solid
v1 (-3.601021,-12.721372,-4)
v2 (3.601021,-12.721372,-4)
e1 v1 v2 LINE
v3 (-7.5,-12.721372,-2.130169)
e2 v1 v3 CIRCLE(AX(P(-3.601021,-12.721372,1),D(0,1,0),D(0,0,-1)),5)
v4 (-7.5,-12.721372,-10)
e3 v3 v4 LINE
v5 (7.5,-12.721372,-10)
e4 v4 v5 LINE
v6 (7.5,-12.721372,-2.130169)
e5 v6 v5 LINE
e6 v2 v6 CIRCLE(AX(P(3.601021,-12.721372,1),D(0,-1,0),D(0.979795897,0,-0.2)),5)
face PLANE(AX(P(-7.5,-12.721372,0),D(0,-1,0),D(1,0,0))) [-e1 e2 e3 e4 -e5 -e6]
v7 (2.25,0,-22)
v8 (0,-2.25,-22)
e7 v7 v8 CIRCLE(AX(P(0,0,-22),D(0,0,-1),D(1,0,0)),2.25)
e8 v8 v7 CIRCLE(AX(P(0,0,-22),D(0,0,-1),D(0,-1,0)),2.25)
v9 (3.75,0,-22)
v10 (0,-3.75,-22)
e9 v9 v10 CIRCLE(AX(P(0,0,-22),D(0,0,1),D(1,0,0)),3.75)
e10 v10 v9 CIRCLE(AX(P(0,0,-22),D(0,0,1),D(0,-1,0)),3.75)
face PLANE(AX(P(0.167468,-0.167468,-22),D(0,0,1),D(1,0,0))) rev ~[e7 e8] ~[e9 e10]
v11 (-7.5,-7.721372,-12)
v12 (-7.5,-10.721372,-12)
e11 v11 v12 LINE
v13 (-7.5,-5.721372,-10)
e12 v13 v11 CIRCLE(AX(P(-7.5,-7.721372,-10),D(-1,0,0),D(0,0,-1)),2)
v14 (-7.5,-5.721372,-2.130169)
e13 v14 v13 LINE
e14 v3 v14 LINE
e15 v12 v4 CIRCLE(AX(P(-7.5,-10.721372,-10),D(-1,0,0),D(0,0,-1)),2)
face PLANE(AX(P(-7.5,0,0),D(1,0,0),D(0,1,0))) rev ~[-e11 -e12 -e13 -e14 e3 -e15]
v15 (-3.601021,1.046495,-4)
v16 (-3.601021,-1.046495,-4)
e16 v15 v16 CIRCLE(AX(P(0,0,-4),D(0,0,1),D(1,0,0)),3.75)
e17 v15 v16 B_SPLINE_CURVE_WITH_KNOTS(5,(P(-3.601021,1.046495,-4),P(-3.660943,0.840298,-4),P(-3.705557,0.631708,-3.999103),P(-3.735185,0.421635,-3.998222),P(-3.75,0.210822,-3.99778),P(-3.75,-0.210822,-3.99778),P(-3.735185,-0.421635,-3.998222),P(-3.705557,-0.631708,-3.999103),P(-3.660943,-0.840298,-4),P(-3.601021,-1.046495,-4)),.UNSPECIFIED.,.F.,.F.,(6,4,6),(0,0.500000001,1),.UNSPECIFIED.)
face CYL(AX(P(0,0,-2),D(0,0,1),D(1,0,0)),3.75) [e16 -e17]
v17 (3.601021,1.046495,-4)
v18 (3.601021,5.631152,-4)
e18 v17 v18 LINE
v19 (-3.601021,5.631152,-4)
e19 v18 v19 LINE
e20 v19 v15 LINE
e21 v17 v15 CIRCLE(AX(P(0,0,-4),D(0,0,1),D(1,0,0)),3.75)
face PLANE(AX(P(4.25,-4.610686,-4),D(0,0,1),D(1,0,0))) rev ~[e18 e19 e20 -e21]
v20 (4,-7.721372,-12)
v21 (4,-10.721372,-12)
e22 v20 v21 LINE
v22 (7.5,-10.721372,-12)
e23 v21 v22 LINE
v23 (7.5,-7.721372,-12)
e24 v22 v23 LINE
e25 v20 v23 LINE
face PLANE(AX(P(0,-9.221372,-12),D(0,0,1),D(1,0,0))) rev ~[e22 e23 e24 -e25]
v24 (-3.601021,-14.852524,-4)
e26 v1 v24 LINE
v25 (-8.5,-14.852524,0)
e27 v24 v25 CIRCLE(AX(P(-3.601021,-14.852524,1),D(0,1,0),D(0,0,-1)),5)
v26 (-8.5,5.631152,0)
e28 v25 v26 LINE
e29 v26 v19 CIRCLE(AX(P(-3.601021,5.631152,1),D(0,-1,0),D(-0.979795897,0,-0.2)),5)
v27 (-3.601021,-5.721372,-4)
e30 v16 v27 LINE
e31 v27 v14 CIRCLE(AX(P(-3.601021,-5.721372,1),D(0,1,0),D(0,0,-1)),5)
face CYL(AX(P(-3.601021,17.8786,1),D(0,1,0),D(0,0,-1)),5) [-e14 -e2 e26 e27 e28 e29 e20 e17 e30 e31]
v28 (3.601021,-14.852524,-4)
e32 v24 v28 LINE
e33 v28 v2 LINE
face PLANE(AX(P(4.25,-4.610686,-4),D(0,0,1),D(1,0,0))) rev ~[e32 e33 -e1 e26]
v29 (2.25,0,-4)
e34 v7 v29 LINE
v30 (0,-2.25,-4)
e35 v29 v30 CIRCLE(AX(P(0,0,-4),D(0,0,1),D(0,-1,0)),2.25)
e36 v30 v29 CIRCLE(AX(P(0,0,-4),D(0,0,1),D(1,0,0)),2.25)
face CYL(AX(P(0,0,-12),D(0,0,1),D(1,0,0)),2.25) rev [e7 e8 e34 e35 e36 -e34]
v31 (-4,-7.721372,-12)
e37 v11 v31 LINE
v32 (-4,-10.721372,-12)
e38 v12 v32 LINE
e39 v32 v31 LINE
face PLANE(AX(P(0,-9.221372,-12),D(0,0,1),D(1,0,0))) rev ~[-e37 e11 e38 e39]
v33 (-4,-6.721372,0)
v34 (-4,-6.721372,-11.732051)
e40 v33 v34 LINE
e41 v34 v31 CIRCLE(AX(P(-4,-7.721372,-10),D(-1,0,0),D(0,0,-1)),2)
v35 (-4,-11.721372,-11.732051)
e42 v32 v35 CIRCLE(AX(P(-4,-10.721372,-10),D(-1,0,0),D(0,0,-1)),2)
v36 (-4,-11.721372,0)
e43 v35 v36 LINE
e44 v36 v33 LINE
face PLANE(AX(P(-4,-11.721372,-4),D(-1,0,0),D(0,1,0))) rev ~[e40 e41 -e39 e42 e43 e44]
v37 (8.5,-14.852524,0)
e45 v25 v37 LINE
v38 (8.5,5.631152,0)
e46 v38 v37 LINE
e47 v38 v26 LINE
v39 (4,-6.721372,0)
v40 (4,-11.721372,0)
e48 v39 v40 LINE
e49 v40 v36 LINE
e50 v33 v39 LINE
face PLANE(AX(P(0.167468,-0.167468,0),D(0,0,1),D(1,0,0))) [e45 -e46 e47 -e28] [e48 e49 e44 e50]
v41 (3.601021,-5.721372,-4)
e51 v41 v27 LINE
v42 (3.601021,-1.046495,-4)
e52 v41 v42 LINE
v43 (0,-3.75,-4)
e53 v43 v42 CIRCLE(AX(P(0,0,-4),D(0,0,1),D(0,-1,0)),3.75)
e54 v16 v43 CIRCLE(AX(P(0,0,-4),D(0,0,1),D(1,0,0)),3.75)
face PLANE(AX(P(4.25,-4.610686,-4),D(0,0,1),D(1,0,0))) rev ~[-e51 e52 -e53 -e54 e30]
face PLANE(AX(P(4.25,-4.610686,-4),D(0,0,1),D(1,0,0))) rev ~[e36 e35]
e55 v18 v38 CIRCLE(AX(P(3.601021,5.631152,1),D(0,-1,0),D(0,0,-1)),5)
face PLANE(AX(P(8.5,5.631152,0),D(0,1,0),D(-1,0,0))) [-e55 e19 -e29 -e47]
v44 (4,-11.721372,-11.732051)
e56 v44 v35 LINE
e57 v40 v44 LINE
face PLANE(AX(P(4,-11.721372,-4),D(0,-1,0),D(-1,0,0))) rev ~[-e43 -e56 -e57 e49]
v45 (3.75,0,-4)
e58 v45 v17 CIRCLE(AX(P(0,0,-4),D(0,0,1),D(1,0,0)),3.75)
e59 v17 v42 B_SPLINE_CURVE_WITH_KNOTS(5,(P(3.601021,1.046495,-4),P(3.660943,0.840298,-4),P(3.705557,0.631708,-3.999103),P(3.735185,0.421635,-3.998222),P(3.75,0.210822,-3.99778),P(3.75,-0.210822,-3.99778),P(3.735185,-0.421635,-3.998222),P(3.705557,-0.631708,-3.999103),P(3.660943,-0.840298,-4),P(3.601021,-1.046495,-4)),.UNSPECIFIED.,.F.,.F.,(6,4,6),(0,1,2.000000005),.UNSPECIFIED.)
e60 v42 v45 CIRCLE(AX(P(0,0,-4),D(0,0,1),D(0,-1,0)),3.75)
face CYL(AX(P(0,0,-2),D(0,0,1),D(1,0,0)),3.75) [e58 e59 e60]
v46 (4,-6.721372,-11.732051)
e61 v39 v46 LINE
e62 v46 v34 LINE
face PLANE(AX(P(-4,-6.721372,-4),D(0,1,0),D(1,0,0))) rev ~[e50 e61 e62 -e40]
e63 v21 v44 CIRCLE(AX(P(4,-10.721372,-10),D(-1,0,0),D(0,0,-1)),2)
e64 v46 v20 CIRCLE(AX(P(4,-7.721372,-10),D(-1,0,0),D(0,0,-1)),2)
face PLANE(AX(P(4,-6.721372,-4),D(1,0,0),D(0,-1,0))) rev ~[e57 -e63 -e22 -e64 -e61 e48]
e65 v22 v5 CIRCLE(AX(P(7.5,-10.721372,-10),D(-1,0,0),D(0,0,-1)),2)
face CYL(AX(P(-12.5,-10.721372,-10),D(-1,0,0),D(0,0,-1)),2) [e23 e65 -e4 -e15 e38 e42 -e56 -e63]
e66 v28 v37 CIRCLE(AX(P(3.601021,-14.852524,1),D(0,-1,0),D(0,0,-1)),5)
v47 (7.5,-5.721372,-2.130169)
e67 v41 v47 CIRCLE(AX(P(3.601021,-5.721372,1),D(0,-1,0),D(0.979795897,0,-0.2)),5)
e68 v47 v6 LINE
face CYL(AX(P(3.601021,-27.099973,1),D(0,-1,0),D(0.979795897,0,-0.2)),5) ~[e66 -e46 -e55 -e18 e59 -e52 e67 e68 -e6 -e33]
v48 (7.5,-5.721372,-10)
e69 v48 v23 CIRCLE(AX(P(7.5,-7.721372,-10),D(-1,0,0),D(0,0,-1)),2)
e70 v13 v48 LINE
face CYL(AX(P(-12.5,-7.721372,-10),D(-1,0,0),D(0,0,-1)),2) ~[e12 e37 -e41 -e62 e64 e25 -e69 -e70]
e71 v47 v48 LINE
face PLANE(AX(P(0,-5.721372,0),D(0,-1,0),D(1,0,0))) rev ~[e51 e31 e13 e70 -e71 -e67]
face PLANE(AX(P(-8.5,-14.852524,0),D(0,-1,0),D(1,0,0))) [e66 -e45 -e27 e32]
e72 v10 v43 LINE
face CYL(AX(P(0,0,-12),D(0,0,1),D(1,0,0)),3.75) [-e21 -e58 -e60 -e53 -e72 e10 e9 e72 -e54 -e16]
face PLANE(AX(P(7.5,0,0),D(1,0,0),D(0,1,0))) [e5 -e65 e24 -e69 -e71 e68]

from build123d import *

# Parameters (mm, degrees)
F1_W         = 8.5
F1_H         = 20.4836754128
F2_DEPTH     = 4
F3_DEPTH     = 12
F4_DEPTH     = 4
F5_DEPTH     = 10
F6_T1_DEPTH  = 25
F7_T4_DEPTH  = 44.9785728407
F7_S6_R      = 3.75
F7_T7_DEPTH  = 24
F7_T11_DEPTH = 44.9785728407
F7_T16_DEPTH = 44.9785728407
F7_T21_DEPTH = 44.9785728407
F7_T26_DEPTH = 44.9785728407
F7_T31_DEPTH = 44.9785728407
F7_S33_R     = 3.75
F7_T34_DEPTH = 24


# Not quite as in the source:
# - a fillet or chamfer that OpenCascade refuses, or shapes differently, is made with other operations: its cross-section is extruded or revolved along the edge and cut away or added


with BuildPart() as f2:
    # F1 (on Top) → F2 (new body)
    with BuildSketch(Plane.XY):
        with Locations((4.25, -4.6106860973)):
            Rectangle(F1_W, F1_H)
        with Locations((-4.25, -4.6106860973)):
            Rectangle(F1_W, F1_H)
    extrude(amount=-F2_DEPTH)

    # F0 (on Top) → F3 (join)
    with BuildSketch(Plane.XY):
        with BuildLine():
            ThreePointArc((3.75, 0), (-2.6516504294, 2.6516504294), (0, -3.75))
            ThreePointArc((0, -3.75), (2.6516504294, -2.6516504294), (3.75, 0))
        make_face()
        with BuildLine():
            ThreePointArc((0, -2.25), (-1.5909902577, 1.5909902577), (2.25, 0))
            ThreePointArc((2.25, 0), (1.5909902577, -1.5909902577), (0, -2.25))
        make_face(mode=Mode.SUBTRACT)
        Polygon((7.5, -5.7213721946), (0, -5.7213721946), (-7.5, -5.7213721946), (-7.5, -12.7213721946), (7.5, -12.7213721946), align=None)
        Polygon((-4, -6.7213721946), (0, -6.7213721946), (4, -6.7213721946), (4, -11.7213721946), (-4, -11.7213721946), align=None, mode=Mode.SUBTRACT)
    extrude(amount=-F3_DEPTH)

    # F4 (cut): a face of the model
    f4_faces = [f2.faces().sort_by_distance(p)[0] for p in [
        (0, -9.2213721946, -4),
    ]]
    extrude(f4_faces, amount=-F4_DEPTH, mode=Mode.SUBTRACT)

    # F5 (add): a face of the model
    f5_faces = [f2.faces().sort_by_distance(p)[0] for p in [
        (0, 3.6439339828, -12),
    ]]
    extrude(f5_faces, amount=F5_DEPTH)

    # F6: fillet of radius 2 on 2 edges, made by hand

    # F6_s2 → F6_t1 (cut)
    with BuildSketch(Plane.YZ.offset(-12.5)):
        with BuildLine():
            ThreePointArc((-10.7213721946, -12), (-12.135585757, -11.4142135624), (-12.7213721946, -10))
            Line((-12.7213721946, -10), (-12.7213721946, -12))
            Line((-12.7213721946, -12), (-10.7213721946, -12))
        make_face()
        with BuildLine():
            ThreePointArc((-7.7213721946, -12), (-6.3071586322, -11.4142135624), (-5.7213721946, -10))
            Line((-5.7213721946, -10), (-5.7213721946, -12))
            Line((-5.7213721946, -12), (-7.7213721946, -12))
        make_face()
    extrude(amount=F6_T1_DEPTH, mode=Mode.SUBTRACT)

    # F7: fillet of radius 5 on 2 edges, made by hand


with BuildPart() as f7_tool2:
    # F7_s3 → F7_t4 (new body)
    with BuildSketch(Plane.XZ.offset(-17.8786003231)):
        with BuildLine():
            ThreePointArc((-3.6010205144, -4), (-6.7632981746, -2.8729833462), (-8.5, 0))
            Line((-8.5, 0), (-8.5, -4))
            Line((-8.5, -4), (-3.6010205144, -4))
        make_face()
    extrude(amount=F7_T4_DEPTH)

    split(bisect_by=Plane.XZ.offset(5.7213721946), keep=Keep.BOTTOM)

    # F7_s6 → F7_t7 (cut, symmetric)
    with BuildSketch(Plane.XY.offset(-2)):
        Circle(F7_S6_R)
    extrude(amount=F7_T7_DEPTH, both=True, mode=Mode.SUBTRACT)


with BuildPart() as f2_1:
    add(f2.part)

    # F7_t1: cut F7_tool2
    add(f7_tool2.part, mode=Mode.SUBTRACT)


with BuildPart() as f7_tool9:
    # F7_s10 → F7_t11 (new body)
    with BuildSketch(Plane.XZ.offset(-17.8786003231)):
        with BuildLine():
            ThreePointArc((-3.6010205144, -4), (-6.7632981746, -2.8729833462), (-8.5, 0))
            Line((-8.5, 0), (-8.5, -4))
            Line((-8.5, -4), (-3.6010205144, -4))
        make_face()
    extrude(amount=F7_T11_DEPTH)

    split(bisect_by=Plane.YZ.offset(-7.5), keep=Keep.BOTTOM)


with BuildPart() as f2_2:
    add(f2_1.part)

    # F7_t8: cut F7_tool9
    add(f7_tool9.part, mode=Mode.SUBTRACT)


with BuildPart() as f7_tool14:
    # F7_s15 → F7_t16 (new body)
    with BuildSketch(Plane.XZ.offset(-17.8786003231)):
        with BuildLine():
            ThreePointArc((-3.6010205144, -4), (-6.7632981746, -2.8729833462), (-8.5, 0))
            Line((-8.5, 0), (-8.5, -4))
            Line((-8.5, -4), (-3.6010205144, -4))
        make_face()
    extrude(amount=F7_T16_DEPTH)

    split(bisect_by=Plane.XZ.offset(12.7213721946), keep=Keep.TOP)


with BuildPart() as f2_3:
    add(f2_2.part)

    # F7_t13: cut F7_tool14
    add(f7_tool14.part, mode=Mode.SUBTRACT)


with BuildPart() as f7_tool19:
    # F7_s20 → F7_t21 (new body)
    with BuildSketch(Plane.XZ.offset(27.0999725176)):
        with BuildLine():
            ThreePointArc((8.5, 0), (6.7632981746, -2.8729833462), (3.6010205144, -4))
            Line((3.6010205144, -4), (8.5, -4))
            Line((8.5, -4), (8.5, 0))
        make_face()
    extrude(amount=-F7_T21_DEPTH)

    split(bisect_by=Plane.YZ.offset(7.5), keep=Keep.TOP)


with BuildPart() as f2_4:
    add(f2_3.part)

    # F7_t18: cut F7_tool19
    add(f7_tool19.part, mode=Mode.SUBTRACT)


with BuildPart() as f7_tool24:
    # F7_s25 → F7_t26 (new body)
    with BuildSketch(Plane.XZ.offset(27.0999725176)):
        with BuildLine():
            ThreePointArc((8.5, 0), (6.7632981746, -2.8729833462), (3.6010205144, -4))
            Line((3.6010205144, -4), (8.5, -4))
            Line((8.5, -4), (8.5, 0))
        make_face()
    extrude(amount=-F7_T26_DEPTH)

    split(bisect_by=Plane.XZ.offset(12.7213721946), keep=Keep.TOP)


with BuildPart() as f2_5:
    add(f2_4.part)

    # F7_t23: cut F7_tool24
    add(f7_tool24.part, mode=Mode.SUBTRACT)


with BuildPart() as f7_tool29:
    # F7_s30 → F7_t31 (new body)
    with BuildSketch(Plane.XZ.offset(27.0999725176)):
        with BuildLine():
            ThreePointArc((8.5, 0), (6.7632981746, -2.8729833462), (3.6010205144, -4))
            Line((3.6010205144, -4), (8.5, -4))
            Line((8.5, -4), (8.5, 0))
        make_face()
    extrude(amount=-F7_T31_DEPTH)

    split(bisect_by=Plane.XZ.offset(5.7213721946), keep=Keep.BOTTOM)

    # F7_s33 → F7_t34 (cut, symmetric)
    with BuildSketch(Plane.XY.offset(-2)):
        Circle(F7_S33_R)
    extrude(amount=F7_T34_DEPTH, both=True, mode=Mode.SUBTRACT)


with BuildPart() as f2_6:
    add(f2_5.part)

    # F7_t28: cut F7_tool29
    add(f7_tool29.part, mode=Mode.SUBTRACT)


solid = f2_6.part
